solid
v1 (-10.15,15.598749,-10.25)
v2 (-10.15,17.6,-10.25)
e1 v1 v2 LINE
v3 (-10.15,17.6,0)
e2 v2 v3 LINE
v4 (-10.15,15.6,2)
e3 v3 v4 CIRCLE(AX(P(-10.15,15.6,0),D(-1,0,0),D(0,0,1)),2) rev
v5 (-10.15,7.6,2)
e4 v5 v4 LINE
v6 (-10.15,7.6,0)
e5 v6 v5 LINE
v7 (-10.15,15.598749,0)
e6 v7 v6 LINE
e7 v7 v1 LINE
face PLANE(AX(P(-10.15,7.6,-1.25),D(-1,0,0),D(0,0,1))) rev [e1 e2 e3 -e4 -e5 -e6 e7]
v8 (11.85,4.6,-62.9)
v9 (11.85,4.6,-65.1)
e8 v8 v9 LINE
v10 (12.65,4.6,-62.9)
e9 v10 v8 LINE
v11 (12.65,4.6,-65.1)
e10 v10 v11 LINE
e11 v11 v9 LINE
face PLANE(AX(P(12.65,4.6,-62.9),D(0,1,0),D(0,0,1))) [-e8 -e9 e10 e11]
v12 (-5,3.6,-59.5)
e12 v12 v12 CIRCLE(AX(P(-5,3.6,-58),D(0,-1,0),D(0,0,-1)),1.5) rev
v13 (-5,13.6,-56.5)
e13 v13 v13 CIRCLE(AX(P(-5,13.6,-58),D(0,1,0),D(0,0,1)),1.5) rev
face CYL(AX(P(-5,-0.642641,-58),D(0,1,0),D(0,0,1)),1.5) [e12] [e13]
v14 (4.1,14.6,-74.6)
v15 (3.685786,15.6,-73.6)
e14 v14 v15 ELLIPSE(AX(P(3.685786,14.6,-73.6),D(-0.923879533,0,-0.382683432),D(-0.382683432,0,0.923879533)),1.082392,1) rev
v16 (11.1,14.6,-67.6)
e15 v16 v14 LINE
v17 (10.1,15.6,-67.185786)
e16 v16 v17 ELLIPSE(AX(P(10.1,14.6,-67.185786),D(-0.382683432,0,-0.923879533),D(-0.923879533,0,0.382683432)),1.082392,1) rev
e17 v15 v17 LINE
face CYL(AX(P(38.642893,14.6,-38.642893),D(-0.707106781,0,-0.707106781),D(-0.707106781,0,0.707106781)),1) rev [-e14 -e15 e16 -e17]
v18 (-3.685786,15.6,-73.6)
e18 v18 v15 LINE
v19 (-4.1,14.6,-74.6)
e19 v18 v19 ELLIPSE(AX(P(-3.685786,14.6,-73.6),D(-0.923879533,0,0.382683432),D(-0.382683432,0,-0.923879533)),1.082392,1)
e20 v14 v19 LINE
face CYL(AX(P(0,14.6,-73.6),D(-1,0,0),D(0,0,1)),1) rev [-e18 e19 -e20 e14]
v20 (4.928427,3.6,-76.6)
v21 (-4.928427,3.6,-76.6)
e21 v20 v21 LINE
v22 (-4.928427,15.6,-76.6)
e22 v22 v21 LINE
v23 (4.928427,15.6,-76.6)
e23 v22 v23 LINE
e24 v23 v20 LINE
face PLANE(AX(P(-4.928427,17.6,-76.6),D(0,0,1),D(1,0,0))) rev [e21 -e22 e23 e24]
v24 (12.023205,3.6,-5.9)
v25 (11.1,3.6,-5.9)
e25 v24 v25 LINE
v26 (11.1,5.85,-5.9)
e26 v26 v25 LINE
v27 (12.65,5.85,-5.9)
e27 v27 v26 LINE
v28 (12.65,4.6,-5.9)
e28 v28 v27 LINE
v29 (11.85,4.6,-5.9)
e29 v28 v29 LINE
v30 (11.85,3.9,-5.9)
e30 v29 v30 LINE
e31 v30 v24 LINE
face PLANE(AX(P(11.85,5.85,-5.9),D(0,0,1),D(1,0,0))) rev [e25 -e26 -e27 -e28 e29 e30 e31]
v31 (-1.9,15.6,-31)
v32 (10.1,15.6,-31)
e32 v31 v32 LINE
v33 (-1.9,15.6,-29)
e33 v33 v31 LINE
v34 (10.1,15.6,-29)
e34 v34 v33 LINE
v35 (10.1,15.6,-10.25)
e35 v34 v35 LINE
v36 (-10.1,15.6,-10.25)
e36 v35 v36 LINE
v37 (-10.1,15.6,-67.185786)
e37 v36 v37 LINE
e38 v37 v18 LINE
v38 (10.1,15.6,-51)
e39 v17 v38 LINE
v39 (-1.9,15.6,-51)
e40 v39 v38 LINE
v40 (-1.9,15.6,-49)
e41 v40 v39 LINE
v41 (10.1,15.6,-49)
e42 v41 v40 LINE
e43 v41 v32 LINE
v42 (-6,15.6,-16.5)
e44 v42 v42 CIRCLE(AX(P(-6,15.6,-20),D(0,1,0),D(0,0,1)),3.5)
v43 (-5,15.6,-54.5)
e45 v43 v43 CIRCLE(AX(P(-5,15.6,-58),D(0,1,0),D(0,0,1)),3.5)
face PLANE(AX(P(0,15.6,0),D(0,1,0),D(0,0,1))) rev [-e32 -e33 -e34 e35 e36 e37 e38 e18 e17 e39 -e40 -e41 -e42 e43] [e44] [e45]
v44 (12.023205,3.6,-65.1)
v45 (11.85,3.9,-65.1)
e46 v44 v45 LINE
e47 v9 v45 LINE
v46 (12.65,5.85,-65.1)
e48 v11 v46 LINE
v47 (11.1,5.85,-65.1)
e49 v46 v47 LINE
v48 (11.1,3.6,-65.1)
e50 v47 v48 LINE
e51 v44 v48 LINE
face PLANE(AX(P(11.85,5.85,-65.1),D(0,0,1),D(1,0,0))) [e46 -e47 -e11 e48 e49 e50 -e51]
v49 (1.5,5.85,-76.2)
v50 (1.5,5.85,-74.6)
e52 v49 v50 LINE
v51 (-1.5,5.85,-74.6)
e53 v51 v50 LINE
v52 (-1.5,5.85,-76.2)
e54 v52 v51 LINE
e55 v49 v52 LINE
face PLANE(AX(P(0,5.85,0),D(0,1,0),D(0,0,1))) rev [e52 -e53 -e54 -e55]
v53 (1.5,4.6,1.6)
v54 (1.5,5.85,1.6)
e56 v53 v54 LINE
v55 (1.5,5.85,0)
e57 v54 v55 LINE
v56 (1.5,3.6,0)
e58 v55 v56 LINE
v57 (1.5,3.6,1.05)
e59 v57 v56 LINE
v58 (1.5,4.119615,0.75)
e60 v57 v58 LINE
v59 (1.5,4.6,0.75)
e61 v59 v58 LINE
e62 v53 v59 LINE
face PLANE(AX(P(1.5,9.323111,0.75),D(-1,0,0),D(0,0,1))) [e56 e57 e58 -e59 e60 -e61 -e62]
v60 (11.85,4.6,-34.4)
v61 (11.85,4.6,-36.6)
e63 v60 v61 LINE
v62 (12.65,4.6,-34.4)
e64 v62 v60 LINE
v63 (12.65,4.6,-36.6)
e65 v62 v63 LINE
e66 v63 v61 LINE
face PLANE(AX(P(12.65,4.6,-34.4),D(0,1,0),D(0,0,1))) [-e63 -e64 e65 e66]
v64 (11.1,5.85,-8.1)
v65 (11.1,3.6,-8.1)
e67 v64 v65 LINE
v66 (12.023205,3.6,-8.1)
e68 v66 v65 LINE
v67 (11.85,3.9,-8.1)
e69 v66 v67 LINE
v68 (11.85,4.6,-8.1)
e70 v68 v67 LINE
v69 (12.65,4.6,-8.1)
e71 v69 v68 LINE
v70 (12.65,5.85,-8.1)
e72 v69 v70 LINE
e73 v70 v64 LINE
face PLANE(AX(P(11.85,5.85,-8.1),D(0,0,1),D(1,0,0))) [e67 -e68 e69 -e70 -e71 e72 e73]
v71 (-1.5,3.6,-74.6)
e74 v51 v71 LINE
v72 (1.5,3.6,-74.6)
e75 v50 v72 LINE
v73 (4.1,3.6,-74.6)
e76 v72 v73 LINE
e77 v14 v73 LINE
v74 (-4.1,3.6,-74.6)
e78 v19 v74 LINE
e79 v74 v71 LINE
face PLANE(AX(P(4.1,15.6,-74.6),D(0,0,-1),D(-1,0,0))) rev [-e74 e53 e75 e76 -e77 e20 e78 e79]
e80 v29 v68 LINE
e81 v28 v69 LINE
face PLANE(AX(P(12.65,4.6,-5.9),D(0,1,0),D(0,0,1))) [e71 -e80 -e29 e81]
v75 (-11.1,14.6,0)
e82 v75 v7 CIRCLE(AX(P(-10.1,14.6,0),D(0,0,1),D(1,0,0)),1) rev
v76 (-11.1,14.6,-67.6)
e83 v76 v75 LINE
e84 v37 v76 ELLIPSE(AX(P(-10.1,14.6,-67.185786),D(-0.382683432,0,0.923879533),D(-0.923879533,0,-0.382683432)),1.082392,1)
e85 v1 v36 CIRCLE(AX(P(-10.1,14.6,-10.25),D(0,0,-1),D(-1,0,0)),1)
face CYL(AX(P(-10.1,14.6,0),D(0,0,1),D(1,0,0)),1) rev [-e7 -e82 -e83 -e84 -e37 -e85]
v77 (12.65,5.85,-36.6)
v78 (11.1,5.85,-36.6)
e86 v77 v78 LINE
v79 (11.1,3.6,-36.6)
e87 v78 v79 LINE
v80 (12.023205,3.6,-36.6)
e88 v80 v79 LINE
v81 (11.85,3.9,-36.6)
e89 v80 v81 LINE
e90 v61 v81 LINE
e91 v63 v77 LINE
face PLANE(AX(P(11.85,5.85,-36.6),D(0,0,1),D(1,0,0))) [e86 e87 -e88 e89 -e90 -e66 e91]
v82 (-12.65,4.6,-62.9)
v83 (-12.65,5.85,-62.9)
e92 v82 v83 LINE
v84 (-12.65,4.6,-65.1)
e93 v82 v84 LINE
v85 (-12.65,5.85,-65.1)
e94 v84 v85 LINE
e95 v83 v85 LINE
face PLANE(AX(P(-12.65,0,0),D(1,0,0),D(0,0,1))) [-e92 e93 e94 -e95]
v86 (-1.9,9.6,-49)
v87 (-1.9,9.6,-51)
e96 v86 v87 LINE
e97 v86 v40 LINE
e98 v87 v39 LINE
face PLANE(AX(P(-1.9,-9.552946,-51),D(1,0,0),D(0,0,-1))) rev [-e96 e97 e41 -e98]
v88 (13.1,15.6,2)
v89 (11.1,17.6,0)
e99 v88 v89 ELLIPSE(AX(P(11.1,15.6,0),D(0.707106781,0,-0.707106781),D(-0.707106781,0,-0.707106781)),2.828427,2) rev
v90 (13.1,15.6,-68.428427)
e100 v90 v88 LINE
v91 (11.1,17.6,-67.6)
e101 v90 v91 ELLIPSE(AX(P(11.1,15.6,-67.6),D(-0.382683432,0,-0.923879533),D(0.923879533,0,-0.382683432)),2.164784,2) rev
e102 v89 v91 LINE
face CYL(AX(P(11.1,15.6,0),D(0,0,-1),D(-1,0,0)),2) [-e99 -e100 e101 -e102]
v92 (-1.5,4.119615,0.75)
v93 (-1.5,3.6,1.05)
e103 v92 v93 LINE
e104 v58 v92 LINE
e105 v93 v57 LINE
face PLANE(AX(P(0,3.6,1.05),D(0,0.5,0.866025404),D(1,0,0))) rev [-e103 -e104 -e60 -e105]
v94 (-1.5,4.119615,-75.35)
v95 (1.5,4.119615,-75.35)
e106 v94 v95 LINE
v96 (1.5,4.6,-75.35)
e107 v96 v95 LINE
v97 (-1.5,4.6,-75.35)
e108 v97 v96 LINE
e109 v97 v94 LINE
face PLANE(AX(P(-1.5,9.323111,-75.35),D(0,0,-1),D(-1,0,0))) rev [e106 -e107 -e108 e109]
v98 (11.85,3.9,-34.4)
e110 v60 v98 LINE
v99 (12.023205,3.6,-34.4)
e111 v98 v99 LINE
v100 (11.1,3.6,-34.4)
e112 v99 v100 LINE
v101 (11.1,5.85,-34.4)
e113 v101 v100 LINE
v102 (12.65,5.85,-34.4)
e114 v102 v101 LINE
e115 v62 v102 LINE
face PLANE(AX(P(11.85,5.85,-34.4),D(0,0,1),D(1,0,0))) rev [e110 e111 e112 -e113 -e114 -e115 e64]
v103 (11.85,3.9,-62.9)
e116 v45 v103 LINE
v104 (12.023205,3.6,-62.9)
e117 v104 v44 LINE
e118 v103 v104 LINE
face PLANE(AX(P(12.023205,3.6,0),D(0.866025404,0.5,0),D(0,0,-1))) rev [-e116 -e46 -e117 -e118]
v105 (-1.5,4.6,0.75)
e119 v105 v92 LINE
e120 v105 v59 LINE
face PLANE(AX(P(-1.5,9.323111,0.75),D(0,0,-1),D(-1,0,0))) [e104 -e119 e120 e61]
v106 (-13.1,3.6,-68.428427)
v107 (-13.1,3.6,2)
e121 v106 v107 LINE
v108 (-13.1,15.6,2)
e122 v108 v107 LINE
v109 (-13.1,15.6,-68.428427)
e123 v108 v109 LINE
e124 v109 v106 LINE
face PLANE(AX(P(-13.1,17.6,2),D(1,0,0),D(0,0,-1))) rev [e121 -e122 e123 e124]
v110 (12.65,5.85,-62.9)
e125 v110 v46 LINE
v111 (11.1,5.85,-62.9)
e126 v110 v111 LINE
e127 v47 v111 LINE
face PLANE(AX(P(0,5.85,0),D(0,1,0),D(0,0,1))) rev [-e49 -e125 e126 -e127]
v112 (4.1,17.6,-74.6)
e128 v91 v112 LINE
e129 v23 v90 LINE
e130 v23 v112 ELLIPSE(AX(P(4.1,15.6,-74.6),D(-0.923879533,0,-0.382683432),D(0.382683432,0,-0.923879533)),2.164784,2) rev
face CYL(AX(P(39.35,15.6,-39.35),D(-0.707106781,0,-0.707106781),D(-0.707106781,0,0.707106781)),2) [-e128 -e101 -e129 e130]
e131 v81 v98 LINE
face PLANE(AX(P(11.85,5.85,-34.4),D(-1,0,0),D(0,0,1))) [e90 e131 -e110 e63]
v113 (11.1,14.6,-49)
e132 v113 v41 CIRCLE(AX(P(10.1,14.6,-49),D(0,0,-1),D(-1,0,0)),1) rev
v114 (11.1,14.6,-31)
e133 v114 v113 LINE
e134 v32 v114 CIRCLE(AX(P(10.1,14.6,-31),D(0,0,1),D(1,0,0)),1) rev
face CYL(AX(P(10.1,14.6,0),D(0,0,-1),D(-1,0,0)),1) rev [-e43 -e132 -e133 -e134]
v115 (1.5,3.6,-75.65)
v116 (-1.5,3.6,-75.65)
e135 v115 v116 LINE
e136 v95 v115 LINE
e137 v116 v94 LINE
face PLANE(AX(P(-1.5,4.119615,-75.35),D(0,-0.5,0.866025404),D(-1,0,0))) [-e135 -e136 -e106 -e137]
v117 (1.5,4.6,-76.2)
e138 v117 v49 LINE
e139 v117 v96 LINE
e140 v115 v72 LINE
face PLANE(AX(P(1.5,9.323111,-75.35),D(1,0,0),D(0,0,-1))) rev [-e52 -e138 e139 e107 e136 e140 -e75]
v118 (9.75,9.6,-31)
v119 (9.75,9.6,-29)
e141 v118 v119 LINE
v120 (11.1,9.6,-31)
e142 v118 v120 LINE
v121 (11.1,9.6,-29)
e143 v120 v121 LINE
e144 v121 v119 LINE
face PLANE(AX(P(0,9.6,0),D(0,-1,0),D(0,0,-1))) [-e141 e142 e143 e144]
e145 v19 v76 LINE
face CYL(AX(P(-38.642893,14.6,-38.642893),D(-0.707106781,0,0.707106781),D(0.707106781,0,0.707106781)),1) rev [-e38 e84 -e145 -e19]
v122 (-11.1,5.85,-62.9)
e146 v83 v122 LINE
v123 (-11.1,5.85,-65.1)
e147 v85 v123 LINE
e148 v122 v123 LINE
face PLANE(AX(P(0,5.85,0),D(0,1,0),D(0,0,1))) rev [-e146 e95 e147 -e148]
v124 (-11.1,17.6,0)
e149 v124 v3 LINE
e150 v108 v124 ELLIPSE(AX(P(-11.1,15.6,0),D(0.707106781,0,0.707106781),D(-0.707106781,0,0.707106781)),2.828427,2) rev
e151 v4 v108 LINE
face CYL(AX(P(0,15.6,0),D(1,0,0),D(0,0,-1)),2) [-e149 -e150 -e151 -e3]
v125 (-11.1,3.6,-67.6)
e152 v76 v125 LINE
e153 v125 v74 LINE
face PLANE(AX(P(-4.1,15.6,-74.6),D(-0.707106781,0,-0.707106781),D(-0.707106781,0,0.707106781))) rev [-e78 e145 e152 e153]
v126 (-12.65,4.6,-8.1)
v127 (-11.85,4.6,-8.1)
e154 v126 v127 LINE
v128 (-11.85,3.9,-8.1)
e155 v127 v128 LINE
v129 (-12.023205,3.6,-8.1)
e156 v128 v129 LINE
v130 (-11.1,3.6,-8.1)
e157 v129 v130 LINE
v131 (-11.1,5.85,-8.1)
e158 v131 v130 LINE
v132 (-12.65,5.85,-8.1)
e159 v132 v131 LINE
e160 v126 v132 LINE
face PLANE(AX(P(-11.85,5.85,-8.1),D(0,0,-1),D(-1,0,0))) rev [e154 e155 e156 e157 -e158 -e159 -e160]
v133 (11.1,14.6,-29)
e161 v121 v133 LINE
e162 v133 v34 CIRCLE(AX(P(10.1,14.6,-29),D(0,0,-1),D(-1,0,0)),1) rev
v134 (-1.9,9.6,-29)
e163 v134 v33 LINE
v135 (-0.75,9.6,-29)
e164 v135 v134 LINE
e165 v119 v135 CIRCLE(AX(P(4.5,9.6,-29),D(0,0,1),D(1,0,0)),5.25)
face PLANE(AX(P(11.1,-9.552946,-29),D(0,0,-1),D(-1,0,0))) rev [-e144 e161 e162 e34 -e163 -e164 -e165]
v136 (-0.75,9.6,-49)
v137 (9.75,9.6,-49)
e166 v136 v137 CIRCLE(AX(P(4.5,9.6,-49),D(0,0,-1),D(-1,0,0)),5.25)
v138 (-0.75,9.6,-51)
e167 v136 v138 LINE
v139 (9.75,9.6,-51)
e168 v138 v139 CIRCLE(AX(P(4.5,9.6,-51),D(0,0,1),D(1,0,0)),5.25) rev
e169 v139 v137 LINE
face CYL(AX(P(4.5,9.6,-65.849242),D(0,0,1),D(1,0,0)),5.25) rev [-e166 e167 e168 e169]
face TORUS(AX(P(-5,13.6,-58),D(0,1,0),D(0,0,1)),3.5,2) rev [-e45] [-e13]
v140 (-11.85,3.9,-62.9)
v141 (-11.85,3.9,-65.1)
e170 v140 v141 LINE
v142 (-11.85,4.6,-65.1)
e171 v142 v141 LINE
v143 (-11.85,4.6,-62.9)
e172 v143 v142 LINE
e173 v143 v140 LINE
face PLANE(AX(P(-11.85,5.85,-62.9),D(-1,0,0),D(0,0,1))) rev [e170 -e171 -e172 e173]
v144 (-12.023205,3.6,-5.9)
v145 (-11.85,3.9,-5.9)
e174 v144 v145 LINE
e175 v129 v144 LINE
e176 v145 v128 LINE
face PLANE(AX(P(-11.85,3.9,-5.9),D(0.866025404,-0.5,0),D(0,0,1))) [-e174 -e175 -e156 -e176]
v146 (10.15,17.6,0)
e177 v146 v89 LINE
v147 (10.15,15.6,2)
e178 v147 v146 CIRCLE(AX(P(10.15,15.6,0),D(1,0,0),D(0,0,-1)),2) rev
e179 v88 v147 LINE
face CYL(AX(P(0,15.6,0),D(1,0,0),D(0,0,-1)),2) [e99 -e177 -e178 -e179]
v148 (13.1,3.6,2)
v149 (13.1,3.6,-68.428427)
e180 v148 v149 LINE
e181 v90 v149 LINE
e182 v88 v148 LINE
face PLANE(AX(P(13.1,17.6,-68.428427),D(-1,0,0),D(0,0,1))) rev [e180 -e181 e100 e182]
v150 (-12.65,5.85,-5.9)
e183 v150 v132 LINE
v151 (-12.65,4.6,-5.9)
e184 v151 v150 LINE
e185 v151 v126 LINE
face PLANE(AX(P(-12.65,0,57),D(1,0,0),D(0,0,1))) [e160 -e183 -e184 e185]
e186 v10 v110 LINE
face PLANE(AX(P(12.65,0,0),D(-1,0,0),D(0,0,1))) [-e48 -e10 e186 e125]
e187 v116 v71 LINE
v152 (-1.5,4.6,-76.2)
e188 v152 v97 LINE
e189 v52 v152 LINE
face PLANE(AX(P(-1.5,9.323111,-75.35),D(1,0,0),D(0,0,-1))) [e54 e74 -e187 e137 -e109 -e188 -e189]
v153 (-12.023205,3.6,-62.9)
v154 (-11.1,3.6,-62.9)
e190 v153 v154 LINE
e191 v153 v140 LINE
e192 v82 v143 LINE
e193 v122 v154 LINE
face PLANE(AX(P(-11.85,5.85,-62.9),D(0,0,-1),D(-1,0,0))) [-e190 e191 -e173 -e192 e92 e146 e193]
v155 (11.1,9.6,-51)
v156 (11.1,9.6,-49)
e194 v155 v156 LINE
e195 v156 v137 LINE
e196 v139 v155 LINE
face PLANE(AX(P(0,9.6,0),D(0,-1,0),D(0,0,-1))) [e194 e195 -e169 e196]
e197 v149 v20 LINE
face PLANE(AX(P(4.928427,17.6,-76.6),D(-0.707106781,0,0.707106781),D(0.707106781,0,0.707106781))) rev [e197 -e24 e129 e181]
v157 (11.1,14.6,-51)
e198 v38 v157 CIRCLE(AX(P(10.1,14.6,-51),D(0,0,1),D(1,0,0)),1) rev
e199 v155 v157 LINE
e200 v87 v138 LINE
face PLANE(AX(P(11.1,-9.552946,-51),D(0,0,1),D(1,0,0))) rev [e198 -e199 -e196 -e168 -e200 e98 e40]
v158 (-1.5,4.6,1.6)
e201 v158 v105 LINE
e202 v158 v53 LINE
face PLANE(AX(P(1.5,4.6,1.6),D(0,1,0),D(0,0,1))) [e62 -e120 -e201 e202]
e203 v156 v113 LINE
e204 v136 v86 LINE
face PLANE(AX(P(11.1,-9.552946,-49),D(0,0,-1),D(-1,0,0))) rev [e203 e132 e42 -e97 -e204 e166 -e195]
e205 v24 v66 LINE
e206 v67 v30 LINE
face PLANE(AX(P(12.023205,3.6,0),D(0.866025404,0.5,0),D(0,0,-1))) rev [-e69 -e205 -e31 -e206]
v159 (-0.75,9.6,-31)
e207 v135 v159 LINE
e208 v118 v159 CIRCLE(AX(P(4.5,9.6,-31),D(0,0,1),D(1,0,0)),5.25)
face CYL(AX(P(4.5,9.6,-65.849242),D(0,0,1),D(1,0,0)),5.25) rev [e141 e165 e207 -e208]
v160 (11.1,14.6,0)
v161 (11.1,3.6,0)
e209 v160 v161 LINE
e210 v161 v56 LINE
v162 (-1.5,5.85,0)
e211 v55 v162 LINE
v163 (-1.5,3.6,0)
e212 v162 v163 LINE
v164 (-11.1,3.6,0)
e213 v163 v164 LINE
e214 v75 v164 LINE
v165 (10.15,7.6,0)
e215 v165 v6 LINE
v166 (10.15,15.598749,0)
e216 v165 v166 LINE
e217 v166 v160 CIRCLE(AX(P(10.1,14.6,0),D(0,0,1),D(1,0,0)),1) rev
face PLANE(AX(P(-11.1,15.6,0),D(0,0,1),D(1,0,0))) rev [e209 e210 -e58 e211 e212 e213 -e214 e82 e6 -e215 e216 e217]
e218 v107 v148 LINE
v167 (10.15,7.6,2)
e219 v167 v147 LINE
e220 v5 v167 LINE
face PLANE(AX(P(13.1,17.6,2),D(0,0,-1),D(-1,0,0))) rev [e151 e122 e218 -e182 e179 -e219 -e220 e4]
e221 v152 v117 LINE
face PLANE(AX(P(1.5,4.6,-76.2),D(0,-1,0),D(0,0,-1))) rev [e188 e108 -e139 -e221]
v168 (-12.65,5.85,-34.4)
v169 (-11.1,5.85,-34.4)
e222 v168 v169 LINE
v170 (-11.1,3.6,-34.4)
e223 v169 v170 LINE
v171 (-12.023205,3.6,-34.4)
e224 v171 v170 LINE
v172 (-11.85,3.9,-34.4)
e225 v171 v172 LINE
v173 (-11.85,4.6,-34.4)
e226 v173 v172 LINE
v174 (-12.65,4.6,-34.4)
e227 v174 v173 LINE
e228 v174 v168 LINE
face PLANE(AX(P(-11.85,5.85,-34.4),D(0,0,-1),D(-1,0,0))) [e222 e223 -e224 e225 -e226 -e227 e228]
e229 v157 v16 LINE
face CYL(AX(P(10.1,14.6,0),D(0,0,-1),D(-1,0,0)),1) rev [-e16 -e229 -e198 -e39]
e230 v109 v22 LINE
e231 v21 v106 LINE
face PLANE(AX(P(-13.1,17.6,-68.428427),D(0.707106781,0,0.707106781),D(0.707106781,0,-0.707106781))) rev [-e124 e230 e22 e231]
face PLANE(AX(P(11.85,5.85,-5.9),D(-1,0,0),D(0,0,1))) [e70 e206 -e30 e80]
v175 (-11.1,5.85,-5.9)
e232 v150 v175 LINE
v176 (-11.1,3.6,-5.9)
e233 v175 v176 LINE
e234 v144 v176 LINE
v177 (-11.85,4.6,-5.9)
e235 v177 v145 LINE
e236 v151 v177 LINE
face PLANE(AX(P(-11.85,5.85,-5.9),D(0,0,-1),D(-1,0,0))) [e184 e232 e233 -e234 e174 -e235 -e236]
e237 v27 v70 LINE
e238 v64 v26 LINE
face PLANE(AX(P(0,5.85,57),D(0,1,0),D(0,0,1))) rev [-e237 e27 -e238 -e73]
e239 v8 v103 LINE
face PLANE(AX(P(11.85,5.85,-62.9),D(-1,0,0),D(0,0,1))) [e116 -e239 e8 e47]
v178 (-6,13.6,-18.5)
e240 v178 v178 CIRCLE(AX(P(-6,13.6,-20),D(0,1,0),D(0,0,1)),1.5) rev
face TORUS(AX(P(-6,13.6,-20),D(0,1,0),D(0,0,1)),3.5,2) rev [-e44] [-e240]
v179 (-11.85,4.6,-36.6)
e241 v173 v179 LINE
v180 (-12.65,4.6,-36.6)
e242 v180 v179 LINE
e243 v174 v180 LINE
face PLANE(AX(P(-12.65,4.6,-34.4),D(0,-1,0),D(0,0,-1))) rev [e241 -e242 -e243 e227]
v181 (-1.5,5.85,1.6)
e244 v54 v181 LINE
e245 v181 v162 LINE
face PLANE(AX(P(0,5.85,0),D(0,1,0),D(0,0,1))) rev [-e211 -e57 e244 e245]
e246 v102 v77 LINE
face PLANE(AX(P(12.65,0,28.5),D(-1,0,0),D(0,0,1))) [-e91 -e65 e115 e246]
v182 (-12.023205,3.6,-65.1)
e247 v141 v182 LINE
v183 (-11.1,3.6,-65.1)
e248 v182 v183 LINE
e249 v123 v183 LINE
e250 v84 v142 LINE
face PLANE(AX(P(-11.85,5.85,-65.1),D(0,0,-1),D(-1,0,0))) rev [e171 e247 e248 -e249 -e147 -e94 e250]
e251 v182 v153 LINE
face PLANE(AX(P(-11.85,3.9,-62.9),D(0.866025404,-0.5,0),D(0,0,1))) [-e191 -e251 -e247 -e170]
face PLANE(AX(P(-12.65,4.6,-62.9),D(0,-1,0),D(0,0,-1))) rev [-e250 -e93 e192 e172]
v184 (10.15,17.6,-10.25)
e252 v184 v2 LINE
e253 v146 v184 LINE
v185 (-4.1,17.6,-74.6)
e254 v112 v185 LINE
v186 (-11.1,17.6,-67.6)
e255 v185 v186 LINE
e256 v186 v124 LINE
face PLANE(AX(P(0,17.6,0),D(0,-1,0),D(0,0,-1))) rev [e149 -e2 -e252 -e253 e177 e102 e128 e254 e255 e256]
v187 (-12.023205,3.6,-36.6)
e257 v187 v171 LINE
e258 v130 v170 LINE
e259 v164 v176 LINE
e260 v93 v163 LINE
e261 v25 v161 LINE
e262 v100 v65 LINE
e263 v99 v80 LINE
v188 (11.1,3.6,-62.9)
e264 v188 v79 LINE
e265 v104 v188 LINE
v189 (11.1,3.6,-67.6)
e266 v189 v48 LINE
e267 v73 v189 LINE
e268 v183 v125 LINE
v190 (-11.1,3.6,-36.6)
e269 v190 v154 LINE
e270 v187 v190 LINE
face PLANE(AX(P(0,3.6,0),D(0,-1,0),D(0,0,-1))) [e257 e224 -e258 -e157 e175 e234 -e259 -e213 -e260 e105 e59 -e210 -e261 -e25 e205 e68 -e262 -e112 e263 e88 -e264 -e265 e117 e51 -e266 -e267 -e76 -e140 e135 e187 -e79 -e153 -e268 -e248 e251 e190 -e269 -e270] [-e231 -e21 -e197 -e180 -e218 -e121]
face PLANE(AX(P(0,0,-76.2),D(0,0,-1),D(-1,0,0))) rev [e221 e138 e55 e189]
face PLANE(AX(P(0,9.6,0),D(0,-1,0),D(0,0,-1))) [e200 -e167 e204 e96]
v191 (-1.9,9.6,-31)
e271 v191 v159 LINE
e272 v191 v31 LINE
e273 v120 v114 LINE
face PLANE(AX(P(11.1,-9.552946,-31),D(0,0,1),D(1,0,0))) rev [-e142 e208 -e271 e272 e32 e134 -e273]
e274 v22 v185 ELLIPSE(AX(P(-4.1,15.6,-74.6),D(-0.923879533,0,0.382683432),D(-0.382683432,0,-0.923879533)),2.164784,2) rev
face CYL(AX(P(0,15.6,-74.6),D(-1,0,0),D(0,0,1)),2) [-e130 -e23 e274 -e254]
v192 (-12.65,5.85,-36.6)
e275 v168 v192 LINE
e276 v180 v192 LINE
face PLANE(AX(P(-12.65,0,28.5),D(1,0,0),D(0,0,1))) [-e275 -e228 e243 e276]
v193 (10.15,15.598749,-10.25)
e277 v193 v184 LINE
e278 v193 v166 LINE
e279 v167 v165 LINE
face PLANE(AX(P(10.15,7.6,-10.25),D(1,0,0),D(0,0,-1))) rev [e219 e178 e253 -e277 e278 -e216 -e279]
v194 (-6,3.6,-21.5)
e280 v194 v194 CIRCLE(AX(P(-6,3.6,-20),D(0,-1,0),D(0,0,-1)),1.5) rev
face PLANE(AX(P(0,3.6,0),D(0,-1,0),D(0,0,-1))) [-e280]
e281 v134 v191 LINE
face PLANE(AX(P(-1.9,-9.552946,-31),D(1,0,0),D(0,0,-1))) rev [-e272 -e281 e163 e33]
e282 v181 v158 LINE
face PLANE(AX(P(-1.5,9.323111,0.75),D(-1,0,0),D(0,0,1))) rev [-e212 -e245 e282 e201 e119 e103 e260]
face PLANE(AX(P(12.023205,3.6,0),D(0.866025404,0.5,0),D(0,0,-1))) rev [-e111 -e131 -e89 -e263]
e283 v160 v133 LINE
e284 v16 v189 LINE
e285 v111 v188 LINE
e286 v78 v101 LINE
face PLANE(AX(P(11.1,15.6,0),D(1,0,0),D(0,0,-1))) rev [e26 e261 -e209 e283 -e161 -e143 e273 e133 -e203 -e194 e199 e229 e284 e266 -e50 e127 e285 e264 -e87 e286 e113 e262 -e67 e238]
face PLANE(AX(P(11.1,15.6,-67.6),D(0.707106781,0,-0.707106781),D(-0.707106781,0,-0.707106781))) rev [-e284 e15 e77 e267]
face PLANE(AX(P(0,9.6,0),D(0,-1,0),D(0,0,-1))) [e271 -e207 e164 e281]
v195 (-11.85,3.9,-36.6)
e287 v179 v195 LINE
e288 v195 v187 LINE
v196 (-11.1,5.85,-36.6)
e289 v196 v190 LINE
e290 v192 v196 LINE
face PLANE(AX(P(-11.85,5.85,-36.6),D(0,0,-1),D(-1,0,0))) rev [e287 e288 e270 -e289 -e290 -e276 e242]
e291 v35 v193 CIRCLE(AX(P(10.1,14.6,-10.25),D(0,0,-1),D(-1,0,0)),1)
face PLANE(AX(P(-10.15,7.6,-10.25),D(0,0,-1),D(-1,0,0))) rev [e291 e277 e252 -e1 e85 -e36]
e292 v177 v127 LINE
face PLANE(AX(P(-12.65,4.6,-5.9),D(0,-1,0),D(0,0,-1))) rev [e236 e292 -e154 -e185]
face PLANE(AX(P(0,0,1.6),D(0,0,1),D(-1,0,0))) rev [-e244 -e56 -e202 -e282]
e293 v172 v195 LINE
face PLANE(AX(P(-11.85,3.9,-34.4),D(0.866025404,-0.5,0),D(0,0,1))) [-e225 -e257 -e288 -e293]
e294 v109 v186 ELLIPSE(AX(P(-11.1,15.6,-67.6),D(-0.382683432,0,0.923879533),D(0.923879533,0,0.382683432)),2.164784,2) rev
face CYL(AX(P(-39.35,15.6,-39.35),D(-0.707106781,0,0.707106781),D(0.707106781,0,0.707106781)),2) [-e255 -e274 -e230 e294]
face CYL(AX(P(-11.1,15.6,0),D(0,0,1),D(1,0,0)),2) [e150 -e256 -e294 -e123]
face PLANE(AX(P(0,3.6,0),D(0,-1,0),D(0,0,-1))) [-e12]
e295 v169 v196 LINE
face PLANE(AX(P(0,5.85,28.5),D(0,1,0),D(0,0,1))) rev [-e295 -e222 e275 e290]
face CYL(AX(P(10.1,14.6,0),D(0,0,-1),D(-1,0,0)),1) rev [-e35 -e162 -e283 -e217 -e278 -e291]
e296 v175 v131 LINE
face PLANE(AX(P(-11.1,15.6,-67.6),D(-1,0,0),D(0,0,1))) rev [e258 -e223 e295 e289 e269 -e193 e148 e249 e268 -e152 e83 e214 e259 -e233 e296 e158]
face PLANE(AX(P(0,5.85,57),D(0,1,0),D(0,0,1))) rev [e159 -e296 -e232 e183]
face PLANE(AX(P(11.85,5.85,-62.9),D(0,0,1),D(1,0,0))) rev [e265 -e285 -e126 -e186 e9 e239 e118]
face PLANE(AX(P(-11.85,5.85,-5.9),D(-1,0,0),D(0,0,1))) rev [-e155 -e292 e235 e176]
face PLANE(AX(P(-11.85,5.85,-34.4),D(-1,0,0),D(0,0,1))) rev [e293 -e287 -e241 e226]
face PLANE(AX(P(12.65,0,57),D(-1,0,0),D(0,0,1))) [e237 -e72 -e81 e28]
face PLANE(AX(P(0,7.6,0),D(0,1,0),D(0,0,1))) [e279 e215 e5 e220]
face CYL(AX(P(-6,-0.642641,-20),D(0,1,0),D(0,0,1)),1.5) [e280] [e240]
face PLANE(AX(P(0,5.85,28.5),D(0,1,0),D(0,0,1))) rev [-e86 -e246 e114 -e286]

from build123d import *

# Parameters (mm, degrees)
BOSS_EXTRUDE1_DEPTH       = 14
CUT_EXTRUDE1_DEPTH        = 12
SKETCH3_W                 = 1.75
SKETCH3_H                 = 2.2
CUT_EXTRUDE2_DEPTH        = 2.25
SKETCH5_W                 = 2.2
SKETCH5_H                 = 1.25
CUT_EXTRUDE3_DEPTH        = 0.8
CHAMFER1_SIZE             = 0.3
CHAMFER1_SIZE2            = 0.173205081
CHAMFER1_OF_MIRROR1_SIZE2 = 0.3
CHAMFER1_OF_MIRROR1_SIZE  = 0.173205081
LPATTERN1_START           = -36.6
LPATTERN1_DEPTH           = 2.2
LPATTERN1_START_2         = -8.1
LPATTERN1_2_DEPTH         = 2.2
SKETCH7_W                 = 3
SKETCH7_H                 = 1.75
CUT_EXTRUDE4_DEPTH        = 2.25
CHAMFER2_SIZE             = 0.3
CHAMFER2_SIZE2            = 0.519615242
SKETCH8_W                 = 3
SKETCH8_H                 = 1.25
CUT_EXTRUDE5_DEPTH        = 0.85
CHAMFER2_OF_MIRROR2_SIZE2 = 0.519615242
CHAMFER2_OF_MIRROR2_SIZE  = 0.3
SKETCH9_W                 = 13
SKETCH9_H                 = 2
BOSS_EXTRUDE2_DEPTH       = 6
CUT_EXTRUDE9_REACH        = 54.413
SKETCH10_R                = 5.25
SKETCH11_R                = 1.5
BOSS_EXTRUDE3_DEPTH       = 14
CUT_EXTRUDE10_DEPTH       = 10
FILLET1_R                 = 2
FILLET2_R                 = 1
FILLET3_R                 = 2


# Read off the part's stored shape, not the designer's step: LPattern1
with BuildPart() as part:
    # Sketch1 → Boss-Extrude1 (new body)
    with BuildSketch(Plane(origin=(0, 3.6, 0), x_dir=(1, 0, 0), z_dir=(0, 1, 0))):
        Polygon((-13.1, -2), (-13.1, 68.428427125), (-4.928427125, 76.6), (4.928427125, 76.6), (13.1, 68.428427125), (13.1, -2), align=None)
    extrude(amount=BOSS_EXTRUDE1_DEPTH)

    # Sketch2 → Cut-Extrude1 (cut)
    with BuildSketch(Plane.XZ.offset(-3.6)):
        Polygon((11.1, -67.6), (4.1, -74.6), (-4.1, -74.6), (-11.1, -67.6), (-11.1, 0), (11.1, 0), align=None)
    extrude(amount=-CUT_EXTRUDE1_DEPTH, mode=Mode.SUBTRACT)

    # Sketch3 → Cut-Extrude2 (cut)
    with BuildSketch(Plane.XZ.offset(-3.6)):
        with Locations((10.975, -64)):
            Rectangle(SKETCH3_W, SKETCH3_H)
    cut_extrude2 = extrude(amount=-CUT_EXTRUDE2_DEPTH, mode=Mode.SUBTRACT)

    # Sketch5 → Cut-Extrude3 (cut)
    with BuildSketch(Plane.ZY.offset(-11.85)):
        with Locations((-64, 5.225)):
            Rectangle(SKETCH5_W, SKETCH5_H)
    cut_extrude3 = extrude(amount=-CUT_EXTRUDE3_DEPTH, mode=Mode.SUBTRACT)

    # Chamfer1
    chamfer1_edges = [part.edges().sort_by_distance(p)[0] for p in [
        (11.85, 3.6, -64),
    ]]
    chamfer1_side = [part.faces().sort_by_distance(p)[0] for p in [
        (11.85, 4.1, -64),
    ]]
    chamfer(chamfer1_edges, length=CHAMFER1_SIZE, length2=CHAMFER1_SIZE2, reference=chamfer1_side[0])

    # Mirror1: Cut-Extrude2, Cut-Extrude3 across plane
    add(cut_extrude2.mirror(Plane(origin=(0, 0, 0), x_dir=(0, 0, 1), z_dir=(1, 0, 0))), mode=Mode.SUBTRACT)
    add(cut_extrude3.mirror(Plane(origin=(0, 0, 0), x_dir=(0, 0, 1), z_dir=(1, 0, 0))), mode=Mode.SUBTRACT)

    # Chamfer1 of Mirror1
    chamfer1_of_mirror1_edges = [part.edges().sort_by_distance(p)[0] for p in [
        (-11.85, 3.6, -64),
    ]]
    chamfer(chamfer1_of_mirror1_edges, length=CHAMFER1_OF_MIRROR1_SIZE, length2=CHAMFER1_OF_MIRROR1_SIZE2)

    # LPattern1 outline → LPattern1 (cut)
    with BuildSketch(Plane.XY.offset(LPATTERN1_START)):
        Polygon((-12.023205081, 3.6), (-11.1, 3.6), (-11.1, 5.85), (-12.65, 5.85), (-12.65, 4.6), (-11.85, 4.6), (-11.85, 3.9), align=None)
        Polygon((11.85, 3.9), (11.85, 4.6), (12.65, 4.6), (12.65, 5.85), (11.1, 5.85), (11.1, 3.6), (12.023205081, 3.6), align=None)
    extrude(amount=LPATTERN1_DEPTH, mode=Mode.SUBTRACT)

    # LPattern1 2 outline → LPattern1 2 (cut)
    with BuildSketch(Plane.XY.offset(LPATTERN1_START_2)):
        Polygon((-12.023205081, 3.6), (-11.1, 3.6), (-11.1, 5.85), (-12.65, 5.85), (-12.65, 4.6), (-11.85, 4.6), (-11.85, 3.9), align=None)
        Polygon((11.85, 3.9), (11.85, 4.6), (12.65, 4.6), (12.65, 5.85), (11.1, 5.85), (11.1, 3.6), (12.023205081, 3.6), align=None)
    extrude(amount=LPATTERN1_2_DEPTH, mode=Mode.SUBTRACT)

    # Sketch7 → Cut-Extrude4 (cut)
    with BuildSketch(Plane.XZ.offset(-3.6)):
        with Locations((0, -74.475)):
            Rectangle(SKETCH7_W, SKETCH7_H)
    cut_extrude4 = extrude(amount=-CUT_EXTRUDE4_DEPTH, mode=Mode.SUBTRACT)

    # Chamfer2
    chamfer2_edges = [part.edges().sort_by_distance(p)[0] for p in [
        (0, 3.6, -75.35),
    ]]
    chamfer2_side = [part.faces().sort_by_distance(p)[0] for p in [
        (-12.271483253, 3.6, -33.214213562),
    ]]
    chamfer(chamfer2_edges, length=CHAMFER2_SIZE, length2=CHAMFER2_SIZE2, reference=chamfer2_side[0])

    # Sketch8 → Cut-Extrude5 (cut)
    with BuildSketch(Plane.XY.offset(-75.35)):
        with Locations((0, 5.225)):
            Rectangle(SKETCH8_W, SKETCH8_H)
    cut_extrude5 = extrude(amount=-CUT_EXTRUDE5_DEPTH, mode=Mode.SUBTRACT)

    # Mirror2: Cut-Extrude4, Cut-Extrude5 across plane
    add(cut_extrude4.mirror(Plane.XY.offset(-37.3)), mode=Mode.SUBTRACT)
    add(cut_extrude5.mirror(Plane.XY.offset(-37.3)), mode=Mode.SUBTRACT)

    # Chamfer2 of Mirror2
    chamfer2_of_mirror2_edges = [part.edges().sort_by_distance(p)[0] for p in [
        (0, 3.6, 0.75),
    ]]
    chamfer(chamfer2_of_mirror2_edges, length=CHAMFER2_OF_MIRROR2_SIZE, length2=CHAMFER2_OF_MIRROR2_SIZE2)

    # Sketch9 → Boss-Extrude2 (add)
    with BuildSketch(Plane.XZ.offset(-15.6)):
        with Locations((4.6, -50)):
            Rectangle(SKETCH9_W, SKETCH9_H)
        with Locations((4.6, -30)):
            Rectangle(SKETCH9_W, SKETCH9_H)
    extrude(amount=BOSS_EXTRUDE2_DEPTH)

    # Cut-Extrude9: up to this face of the body (flat: up to its plane)
    cut_extrude9_end = Plane(part.part.faces().sort_by_distance((4.6, 12.6, -51))[0])
    # Sketch10 → Cut-Extrude9 (cut, up to the picked face)
    with BuildSketch(Plane.XY.offset(-29), mode=Mode.PRIVATE) as cut_extrude9_sk1:
        with Locations((4.5, 9.6)):
            Circle(SKETCH10_R)
    cut_extrude9_tool1 = split(extrude(cut_extrude9_sk1.sketch, amount=-CUT_EXTRUDE9_REACH, mode=Mode.PRIVATE), bisect_by=cut_extrude9_end, keep=Keep.BOTH, mode=Mode.PRIVATE)
    add(cut_extrude9_tool1.solids().sort_by(Axis((4.5, 9.6, -29), (0, 0, -1)))[0], mode=Mode.SUBTRACT)

    # Sketch11 → Boss-Extrude3 (add)
    with BuildSketch(Plane(origin=(0, 17.6, 0), x_dir=(1, 0, 0), z_dir=(0, 1, 0))):
        with Locations(Location((-6, 20, 0), (0, 0, 270))):
            Circle(SKETCH11_R)
        with Locations(Location((-5, 58, 0), (0, 0, 270))):
            Circle(SKETCH11_R)
    extrude(amount=-BOSS_EXTRUDE3_DEPTH)

    # Sketch12 → Cut-Extrude10 (cut)
    with BuildSketch(Plane(origin=(0, 17.6, 0), x_dir=(1, 0, 0), z_dir=(0, 1, 0))):
        Polygon((-10.15, 1.25), (-10.15, -2), (10.15, -2), (10.15, 1.25), (10.15, 10.25), (-10.15, 10.25), align=None)
    extrude(amount=-CUT_EXTRUDE10_DEPTH, mode=Mode.SUBTRACT)

    # Fillet1
    fillet1_edges = [part.edges().sort_by_distance(p)[0] for p in [
        (9.014213562, 17.6, -72.514213562),
        (0, 17.6, -76.6),
        (-9.014213562, 17.6, -72.514213562),
        (-13.1, 17.6, -33.214213562),
        (-11.625, 17.6, 2),
        (11.625, 17.6, 2),
        (13.1, 17.6, -33.214213562),
    ]]
    fillet(fillet1_edges, radius=FILLET1_R)

    # Fillet2
    fillet2_edges = [part.edges().sort_by_distance(p)[0] for p in [
        (11.1, 15.6, -59.3),
        (11.1, 15.6, -14.5),
        (7.6, 15.6, -71.1),
        (11.1, 15.6, -40),
        (-7.6, 15.6, -71.1),
        (-11.1, 15.6, -33.8),
        (0, 15.6, -74.6),
    ]]
    fillet(fillet2_edges, radius=FILLET2_R)

    # Fillet3
    fillet3_edges = [part.edges().sort_by_distance(p)[0] for p in [
        (-6, 15.6, -21.5),
        (-5, 15.6, -59.5),
    ]]
    fillet(fillet3_edges, radius=FILLET3_R)


solid = part.part
